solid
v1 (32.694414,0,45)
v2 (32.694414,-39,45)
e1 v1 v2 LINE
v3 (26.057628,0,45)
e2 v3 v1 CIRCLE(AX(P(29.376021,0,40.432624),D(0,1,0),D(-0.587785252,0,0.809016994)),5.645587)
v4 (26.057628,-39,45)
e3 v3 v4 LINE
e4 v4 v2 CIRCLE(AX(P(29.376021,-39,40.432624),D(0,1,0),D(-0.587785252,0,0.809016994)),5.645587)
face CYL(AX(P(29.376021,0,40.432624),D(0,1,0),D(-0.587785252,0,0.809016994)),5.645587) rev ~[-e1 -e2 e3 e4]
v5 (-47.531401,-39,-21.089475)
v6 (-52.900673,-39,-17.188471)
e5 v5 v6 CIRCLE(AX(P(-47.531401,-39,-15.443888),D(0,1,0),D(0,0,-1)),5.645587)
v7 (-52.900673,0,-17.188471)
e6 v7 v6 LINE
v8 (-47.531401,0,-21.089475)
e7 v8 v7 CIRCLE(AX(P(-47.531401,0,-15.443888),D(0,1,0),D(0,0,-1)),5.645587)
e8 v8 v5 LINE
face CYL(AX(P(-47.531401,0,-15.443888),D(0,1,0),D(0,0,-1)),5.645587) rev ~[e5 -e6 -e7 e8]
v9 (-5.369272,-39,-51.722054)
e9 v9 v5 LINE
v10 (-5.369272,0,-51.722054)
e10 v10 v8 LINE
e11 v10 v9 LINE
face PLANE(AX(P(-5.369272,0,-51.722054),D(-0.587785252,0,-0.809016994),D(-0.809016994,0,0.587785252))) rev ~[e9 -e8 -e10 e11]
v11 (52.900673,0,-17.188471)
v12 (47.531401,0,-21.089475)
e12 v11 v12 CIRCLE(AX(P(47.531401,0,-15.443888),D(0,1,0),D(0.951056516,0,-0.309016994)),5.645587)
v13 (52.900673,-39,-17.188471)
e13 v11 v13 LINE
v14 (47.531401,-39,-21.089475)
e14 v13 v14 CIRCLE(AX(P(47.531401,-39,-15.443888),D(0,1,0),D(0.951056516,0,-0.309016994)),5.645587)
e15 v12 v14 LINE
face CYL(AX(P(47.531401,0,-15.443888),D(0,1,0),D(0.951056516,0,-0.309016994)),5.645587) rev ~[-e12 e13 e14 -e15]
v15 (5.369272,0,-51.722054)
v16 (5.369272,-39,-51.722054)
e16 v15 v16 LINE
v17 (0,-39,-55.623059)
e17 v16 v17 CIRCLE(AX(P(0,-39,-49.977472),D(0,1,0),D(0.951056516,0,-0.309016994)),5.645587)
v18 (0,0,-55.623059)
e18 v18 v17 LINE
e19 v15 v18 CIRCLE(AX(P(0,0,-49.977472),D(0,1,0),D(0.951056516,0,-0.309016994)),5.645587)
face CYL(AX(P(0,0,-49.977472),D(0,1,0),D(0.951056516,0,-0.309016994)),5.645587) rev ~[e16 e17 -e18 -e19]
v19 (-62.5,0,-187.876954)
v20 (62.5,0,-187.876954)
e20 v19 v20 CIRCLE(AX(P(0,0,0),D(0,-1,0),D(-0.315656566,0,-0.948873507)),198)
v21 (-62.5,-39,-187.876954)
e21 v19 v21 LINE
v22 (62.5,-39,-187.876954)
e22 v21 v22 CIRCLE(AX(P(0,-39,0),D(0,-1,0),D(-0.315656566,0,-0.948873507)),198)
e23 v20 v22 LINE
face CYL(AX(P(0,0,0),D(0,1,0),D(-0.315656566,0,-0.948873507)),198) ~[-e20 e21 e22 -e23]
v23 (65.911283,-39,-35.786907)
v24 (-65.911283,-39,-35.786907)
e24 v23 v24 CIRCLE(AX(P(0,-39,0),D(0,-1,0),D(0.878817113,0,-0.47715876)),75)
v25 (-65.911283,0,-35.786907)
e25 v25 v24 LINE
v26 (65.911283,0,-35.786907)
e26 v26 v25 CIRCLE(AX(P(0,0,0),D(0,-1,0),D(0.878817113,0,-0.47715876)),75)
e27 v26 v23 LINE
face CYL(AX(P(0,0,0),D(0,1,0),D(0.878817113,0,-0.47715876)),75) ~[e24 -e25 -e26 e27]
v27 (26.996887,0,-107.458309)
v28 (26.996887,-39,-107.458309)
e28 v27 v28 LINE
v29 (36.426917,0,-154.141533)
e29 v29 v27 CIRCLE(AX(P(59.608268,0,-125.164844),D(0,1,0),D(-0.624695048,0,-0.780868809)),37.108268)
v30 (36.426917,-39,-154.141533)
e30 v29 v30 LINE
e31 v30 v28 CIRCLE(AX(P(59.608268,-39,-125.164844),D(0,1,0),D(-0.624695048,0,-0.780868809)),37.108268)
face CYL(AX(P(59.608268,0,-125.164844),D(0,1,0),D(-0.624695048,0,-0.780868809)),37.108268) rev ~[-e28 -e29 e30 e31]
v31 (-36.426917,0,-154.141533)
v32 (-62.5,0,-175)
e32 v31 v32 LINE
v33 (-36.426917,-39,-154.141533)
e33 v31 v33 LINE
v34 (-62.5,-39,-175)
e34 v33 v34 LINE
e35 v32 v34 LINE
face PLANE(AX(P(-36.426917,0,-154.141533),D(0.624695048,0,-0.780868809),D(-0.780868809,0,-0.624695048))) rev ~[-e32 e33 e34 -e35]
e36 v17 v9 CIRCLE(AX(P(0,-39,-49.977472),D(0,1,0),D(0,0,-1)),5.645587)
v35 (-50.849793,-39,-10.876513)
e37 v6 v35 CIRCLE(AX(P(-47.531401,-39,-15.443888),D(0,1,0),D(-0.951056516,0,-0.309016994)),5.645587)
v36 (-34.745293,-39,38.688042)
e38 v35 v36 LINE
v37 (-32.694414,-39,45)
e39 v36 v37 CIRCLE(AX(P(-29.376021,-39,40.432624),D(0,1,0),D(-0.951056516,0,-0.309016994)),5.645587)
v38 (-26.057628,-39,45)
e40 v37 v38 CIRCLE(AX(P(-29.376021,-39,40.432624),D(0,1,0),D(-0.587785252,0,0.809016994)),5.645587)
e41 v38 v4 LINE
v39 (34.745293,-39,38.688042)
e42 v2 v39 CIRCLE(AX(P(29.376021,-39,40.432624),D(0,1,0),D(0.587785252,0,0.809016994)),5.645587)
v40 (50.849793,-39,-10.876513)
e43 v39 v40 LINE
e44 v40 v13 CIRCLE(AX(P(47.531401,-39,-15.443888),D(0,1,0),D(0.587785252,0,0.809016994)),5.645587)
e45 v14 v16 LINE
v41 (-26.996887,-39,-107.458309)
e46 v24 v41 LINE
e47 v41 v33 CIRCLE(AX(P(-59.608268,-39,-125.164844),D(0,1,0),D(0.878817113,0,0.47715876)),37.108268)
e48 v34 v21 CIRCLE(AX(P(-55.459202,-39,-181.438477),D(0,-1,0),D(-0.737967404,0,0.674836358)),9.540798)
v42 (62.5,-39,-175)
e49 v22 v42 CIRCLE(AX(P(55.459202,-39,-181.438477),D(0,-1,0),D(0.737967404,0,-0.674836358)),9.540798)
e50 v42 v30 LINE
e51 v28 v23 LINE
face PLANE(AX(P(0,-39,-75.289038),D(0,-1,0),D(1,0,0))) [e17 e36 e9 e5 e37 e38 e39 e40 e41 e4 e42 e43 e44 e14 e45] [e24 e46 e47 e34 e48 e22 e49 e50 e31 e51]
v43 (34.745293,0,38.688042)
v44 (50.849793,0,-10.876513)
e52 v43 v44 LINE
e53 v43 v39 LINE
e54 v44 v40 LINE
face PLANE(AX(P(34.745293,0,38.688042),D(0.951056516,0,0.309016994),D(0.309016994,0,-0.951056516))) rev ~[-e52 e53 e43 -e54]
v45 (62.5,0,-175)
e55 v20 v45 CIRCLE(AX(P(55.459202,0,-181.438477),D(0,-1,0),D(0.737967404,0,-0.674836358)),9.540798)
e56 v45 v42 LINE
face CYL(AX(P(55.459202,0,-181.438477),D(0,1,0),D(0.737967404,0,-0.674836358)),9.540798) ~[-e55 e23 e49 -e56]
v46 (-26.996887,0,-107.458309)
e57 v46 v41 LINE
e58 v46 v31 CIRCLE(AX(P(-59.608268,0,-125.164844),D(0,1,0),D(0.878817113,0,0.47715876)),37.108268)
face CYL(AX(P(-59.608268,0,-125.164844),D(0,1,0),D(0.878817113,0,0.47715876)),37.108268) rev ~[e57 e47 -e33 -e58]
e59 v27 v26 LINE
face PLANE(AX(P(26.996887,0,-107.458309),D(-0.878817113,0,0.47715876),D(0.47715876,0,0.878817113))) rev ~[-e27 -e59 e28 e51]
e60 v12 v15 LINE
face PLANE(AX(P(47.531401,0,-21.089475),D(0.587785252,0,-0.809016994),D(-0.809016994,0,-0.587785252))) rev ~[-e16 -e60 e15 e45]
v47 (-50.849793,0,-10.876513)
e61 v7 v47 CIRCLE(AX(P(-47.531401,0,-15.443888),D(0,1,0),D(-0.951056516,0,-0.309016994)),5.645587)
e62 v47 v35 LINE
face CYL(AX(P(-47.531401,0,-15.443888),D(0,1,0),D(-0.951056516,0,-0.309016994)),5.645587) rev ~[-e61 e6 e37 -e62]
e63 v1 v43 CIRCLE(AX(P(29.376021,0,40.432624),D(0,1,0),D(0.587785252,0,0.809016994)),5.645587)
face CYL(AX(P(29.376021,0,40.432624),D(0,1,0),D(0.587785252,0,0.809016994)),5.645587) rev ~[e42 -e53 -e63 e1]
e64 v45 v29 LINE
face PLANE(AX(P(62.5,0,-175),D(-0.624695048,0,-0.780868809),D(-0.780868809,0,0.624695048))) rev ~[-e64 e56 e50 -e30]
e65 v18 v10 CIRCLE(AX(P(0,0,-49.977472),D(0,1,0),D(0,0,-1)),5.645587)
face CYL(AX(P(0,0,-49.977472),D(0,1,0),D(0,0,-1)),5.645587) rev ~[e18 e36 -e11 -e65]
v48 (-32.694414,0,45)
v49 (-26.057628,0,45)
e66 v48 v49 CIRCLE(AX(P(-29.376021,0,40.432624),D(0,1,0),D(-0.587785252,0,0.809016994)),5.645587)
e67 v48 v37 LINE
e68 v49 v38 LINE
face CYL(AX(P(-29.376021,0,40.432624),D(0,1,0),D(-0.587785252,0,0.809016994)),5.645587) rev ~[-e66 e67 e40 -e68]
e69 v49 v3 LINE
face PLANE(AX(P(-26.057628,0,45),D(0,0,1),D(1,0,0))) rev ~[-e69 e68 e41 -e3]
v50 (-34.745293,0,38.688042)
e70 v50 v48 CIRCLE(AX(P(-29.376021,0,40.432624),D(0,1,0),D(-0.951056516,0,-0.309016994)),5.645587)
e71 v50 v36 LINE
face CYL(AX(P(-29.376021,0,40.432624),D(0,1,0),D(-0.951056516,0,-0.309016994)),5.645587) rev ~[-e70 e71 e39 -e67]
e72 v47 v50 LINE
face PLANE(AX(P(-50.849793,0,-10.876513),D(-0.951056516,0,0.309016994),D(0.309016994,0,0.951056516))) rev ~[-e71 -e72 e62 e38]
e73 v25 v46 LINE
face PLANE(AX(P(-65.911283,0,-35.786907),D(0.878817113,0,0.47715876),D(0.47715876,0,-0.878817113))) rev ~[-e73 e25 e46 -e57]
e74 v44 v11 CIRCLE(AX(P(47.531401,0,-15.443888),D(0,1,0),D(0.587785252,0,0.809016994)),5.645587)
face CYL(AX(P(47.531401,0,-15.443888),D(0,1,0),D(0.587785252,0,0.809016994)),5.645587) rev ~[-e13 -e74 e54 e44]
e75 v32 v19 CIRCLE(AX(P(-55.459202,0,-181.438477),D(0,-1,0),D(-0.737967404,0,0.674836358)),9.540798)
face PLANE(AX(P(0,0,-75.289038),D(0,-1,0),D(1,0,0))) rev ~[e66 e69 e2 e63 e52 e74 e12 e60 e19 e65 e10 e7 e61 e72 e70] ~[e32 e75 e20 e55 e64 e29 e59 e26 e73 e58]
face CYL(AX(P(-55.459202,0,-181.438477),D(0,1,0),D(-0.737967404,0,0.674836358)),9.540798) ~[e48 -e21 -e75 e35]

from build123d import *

# Parameters (mm, degrees)
F1_DEPTH = 39


with BuildPart() as f1:
    # F0 (on Front) → F1 (new body)
    with BuildSketch(Plane.XZ):
        with BuildLine():
            ThreePointArc((65.9112834496, -35.7869070195), (0, 75), (-65.9112834496, -35.7869070195))
            Line((-65.9112834496, -35.7869070195), (-26.9968870374, -107.4583093791))
            ThreePointArc((-26.9968870374, -107.4583093791), (-23.2346773471, -132.5123240584), (-36.426916686, -154.1415333488))
            Line((-36.426916686, -154.1415333488), (-62.5, -175))
            ThreePointArc((-62.5, -175), (-65, -181.4384772072), (-62.5, -187.8769544143))
            ThreePointArc((-62.5, -187.8769544143), (0, -198), (62.5, -187.8769544143))
            ThreePointArc((62.5, -187.8769544143), (65, -181.4384772072), (62.5, -175))
            Line((62.5, -175), (36.426916686, -154.1415333488))
            ThreePointArc((36.426916686, -154.1415333488), (23.2346773471, -132.5123240584), (26.9968870374, -107.4583093791))
            Line((26.9968870374, -107.4583093791), (65.9112834496, -35.7869070195))
        make_face()
        with BuildLine():
            ThreePointArc((-34.7452932117, 38.6880420754), (-34.7452932117, 42.1772066019), (-32.6944137602, 45))
            ThreePointArc((-32.6944137602, 45), (-29.3760211009, 46.0782111348), (-26.0576284416, 45))
            ThreePointArc((-26.0576284416, 45), (0, 52), (26.0576284416, 45))
            ThreePointArc((26.0576284416, 45), (29.3760211009, 46.0782111348), (32.6944137602, 45))
            ThreePointArc((32.6944137602, 45), (34.7452932117, 42.1772066019), (34.7452932117, 38.6880420754))
            ThreePointArc((34.7452932117, 38.6880420754), (47.4908162017, 21.1807076486), (52, 0))
            ThreePointArc((52, 0), (51.7116488291, -5.4685807459), (50.8497932548, -10.8765125817))
            ThreePointArc((50.8497932548, -10.8765125817), (52.9006727063, -13.6993059798), (52.9006727063, -17.1884705063))
            ThreePointArc((52.9006727063, -17.1884705063), (50.8497932548, -20.0112639043), (47.5314005955, -21.0894750392))
            ThreePointArc((47.5314005955, -21.0894750392), (30.5648331192, -42.0688837075), (5.3692721108, -51.7220544546))
            ThreePointArc((5.3692721108, -51.7220544546), (3.3183926593, -54.5448478526), (0, -55.6230589875))
            ThreePointArc((0, -55.6230589875), (-3.3183926593, -54.5448478526), (-5.3692721108, -51.7220544546))
            ThreePointArc((-5.3692721108, -51.7220544546), (-30.5648331192, -42.0688837075), (-47.5314005955, -21.0894750392))
            ThreePointArc((-47.5314005955, -21.0894750392), (-50.8497932548, -20.0112639043), (-52.9006727063, -17.1884705063))
            ThreePointArc((-52.9006727063, -17.1884705063), (-52.9006727063, -13.6993059798), (-50.8497932548, -10.8765125817))
            ThreePointArc((-50.8497932548, -10.8765125817), (-49.4549388473, 16.0688837075), (-34.7452932117, 38.6880420754))
        make_face(mode=Mode.SUBTRACT)
        with BuildLine():
            ThreePointArc((26.0576284416, 45), (0, 52), (-26.0576284416, 45))
            Line((-26.0576284416, 45), (26.0576284416, 45))
        make_face()
        with BuildLine():
            Line((-50.8497932548, -10.8765125817), (-34.7452932117, 38.6880420754))
            ThreePointArc((-34.7452932117, 38.6880420754), (-49.4549388473, 16.0688837075), (-50.8497932548, -10.8765125817))
        make_face()
        with BuildLine():
            ThreePointArc((52, 0), (47.4908162017, 21.1807076486), (34.7452932117, 38.6880420754))
            Line((34.7452932117, 38.6880420754), (50.8497932548, -10.8765125817))
            ThreePointArc((50.8497932548, -10.8765125817), (51.7116488291, -5.4685807459), (52, 0))
        make_face()
        with BuildLine():
            Line((-5.3692721108, -51.7220544546), (-47.5314005955, -21.0894750392))
            ThreePointArc((-47.5314005955, -21.0894750392), (-30.5648331192, -42.0688837075), (-5.3692721108, -51.7220544546))
        make_face()
        with BuildLine():
            ThreePointArc((5.3692721108, -51.7220544546), (30.5648331192, -42.0688837075), (47.5314005955, -21.0894750392))
            Line((47.5314005955, -21.0894750392), (5.3692721108, -51.7220544546))
        make_face()
    extrude(amount=F1_DEPTH)


solid = f1.part
